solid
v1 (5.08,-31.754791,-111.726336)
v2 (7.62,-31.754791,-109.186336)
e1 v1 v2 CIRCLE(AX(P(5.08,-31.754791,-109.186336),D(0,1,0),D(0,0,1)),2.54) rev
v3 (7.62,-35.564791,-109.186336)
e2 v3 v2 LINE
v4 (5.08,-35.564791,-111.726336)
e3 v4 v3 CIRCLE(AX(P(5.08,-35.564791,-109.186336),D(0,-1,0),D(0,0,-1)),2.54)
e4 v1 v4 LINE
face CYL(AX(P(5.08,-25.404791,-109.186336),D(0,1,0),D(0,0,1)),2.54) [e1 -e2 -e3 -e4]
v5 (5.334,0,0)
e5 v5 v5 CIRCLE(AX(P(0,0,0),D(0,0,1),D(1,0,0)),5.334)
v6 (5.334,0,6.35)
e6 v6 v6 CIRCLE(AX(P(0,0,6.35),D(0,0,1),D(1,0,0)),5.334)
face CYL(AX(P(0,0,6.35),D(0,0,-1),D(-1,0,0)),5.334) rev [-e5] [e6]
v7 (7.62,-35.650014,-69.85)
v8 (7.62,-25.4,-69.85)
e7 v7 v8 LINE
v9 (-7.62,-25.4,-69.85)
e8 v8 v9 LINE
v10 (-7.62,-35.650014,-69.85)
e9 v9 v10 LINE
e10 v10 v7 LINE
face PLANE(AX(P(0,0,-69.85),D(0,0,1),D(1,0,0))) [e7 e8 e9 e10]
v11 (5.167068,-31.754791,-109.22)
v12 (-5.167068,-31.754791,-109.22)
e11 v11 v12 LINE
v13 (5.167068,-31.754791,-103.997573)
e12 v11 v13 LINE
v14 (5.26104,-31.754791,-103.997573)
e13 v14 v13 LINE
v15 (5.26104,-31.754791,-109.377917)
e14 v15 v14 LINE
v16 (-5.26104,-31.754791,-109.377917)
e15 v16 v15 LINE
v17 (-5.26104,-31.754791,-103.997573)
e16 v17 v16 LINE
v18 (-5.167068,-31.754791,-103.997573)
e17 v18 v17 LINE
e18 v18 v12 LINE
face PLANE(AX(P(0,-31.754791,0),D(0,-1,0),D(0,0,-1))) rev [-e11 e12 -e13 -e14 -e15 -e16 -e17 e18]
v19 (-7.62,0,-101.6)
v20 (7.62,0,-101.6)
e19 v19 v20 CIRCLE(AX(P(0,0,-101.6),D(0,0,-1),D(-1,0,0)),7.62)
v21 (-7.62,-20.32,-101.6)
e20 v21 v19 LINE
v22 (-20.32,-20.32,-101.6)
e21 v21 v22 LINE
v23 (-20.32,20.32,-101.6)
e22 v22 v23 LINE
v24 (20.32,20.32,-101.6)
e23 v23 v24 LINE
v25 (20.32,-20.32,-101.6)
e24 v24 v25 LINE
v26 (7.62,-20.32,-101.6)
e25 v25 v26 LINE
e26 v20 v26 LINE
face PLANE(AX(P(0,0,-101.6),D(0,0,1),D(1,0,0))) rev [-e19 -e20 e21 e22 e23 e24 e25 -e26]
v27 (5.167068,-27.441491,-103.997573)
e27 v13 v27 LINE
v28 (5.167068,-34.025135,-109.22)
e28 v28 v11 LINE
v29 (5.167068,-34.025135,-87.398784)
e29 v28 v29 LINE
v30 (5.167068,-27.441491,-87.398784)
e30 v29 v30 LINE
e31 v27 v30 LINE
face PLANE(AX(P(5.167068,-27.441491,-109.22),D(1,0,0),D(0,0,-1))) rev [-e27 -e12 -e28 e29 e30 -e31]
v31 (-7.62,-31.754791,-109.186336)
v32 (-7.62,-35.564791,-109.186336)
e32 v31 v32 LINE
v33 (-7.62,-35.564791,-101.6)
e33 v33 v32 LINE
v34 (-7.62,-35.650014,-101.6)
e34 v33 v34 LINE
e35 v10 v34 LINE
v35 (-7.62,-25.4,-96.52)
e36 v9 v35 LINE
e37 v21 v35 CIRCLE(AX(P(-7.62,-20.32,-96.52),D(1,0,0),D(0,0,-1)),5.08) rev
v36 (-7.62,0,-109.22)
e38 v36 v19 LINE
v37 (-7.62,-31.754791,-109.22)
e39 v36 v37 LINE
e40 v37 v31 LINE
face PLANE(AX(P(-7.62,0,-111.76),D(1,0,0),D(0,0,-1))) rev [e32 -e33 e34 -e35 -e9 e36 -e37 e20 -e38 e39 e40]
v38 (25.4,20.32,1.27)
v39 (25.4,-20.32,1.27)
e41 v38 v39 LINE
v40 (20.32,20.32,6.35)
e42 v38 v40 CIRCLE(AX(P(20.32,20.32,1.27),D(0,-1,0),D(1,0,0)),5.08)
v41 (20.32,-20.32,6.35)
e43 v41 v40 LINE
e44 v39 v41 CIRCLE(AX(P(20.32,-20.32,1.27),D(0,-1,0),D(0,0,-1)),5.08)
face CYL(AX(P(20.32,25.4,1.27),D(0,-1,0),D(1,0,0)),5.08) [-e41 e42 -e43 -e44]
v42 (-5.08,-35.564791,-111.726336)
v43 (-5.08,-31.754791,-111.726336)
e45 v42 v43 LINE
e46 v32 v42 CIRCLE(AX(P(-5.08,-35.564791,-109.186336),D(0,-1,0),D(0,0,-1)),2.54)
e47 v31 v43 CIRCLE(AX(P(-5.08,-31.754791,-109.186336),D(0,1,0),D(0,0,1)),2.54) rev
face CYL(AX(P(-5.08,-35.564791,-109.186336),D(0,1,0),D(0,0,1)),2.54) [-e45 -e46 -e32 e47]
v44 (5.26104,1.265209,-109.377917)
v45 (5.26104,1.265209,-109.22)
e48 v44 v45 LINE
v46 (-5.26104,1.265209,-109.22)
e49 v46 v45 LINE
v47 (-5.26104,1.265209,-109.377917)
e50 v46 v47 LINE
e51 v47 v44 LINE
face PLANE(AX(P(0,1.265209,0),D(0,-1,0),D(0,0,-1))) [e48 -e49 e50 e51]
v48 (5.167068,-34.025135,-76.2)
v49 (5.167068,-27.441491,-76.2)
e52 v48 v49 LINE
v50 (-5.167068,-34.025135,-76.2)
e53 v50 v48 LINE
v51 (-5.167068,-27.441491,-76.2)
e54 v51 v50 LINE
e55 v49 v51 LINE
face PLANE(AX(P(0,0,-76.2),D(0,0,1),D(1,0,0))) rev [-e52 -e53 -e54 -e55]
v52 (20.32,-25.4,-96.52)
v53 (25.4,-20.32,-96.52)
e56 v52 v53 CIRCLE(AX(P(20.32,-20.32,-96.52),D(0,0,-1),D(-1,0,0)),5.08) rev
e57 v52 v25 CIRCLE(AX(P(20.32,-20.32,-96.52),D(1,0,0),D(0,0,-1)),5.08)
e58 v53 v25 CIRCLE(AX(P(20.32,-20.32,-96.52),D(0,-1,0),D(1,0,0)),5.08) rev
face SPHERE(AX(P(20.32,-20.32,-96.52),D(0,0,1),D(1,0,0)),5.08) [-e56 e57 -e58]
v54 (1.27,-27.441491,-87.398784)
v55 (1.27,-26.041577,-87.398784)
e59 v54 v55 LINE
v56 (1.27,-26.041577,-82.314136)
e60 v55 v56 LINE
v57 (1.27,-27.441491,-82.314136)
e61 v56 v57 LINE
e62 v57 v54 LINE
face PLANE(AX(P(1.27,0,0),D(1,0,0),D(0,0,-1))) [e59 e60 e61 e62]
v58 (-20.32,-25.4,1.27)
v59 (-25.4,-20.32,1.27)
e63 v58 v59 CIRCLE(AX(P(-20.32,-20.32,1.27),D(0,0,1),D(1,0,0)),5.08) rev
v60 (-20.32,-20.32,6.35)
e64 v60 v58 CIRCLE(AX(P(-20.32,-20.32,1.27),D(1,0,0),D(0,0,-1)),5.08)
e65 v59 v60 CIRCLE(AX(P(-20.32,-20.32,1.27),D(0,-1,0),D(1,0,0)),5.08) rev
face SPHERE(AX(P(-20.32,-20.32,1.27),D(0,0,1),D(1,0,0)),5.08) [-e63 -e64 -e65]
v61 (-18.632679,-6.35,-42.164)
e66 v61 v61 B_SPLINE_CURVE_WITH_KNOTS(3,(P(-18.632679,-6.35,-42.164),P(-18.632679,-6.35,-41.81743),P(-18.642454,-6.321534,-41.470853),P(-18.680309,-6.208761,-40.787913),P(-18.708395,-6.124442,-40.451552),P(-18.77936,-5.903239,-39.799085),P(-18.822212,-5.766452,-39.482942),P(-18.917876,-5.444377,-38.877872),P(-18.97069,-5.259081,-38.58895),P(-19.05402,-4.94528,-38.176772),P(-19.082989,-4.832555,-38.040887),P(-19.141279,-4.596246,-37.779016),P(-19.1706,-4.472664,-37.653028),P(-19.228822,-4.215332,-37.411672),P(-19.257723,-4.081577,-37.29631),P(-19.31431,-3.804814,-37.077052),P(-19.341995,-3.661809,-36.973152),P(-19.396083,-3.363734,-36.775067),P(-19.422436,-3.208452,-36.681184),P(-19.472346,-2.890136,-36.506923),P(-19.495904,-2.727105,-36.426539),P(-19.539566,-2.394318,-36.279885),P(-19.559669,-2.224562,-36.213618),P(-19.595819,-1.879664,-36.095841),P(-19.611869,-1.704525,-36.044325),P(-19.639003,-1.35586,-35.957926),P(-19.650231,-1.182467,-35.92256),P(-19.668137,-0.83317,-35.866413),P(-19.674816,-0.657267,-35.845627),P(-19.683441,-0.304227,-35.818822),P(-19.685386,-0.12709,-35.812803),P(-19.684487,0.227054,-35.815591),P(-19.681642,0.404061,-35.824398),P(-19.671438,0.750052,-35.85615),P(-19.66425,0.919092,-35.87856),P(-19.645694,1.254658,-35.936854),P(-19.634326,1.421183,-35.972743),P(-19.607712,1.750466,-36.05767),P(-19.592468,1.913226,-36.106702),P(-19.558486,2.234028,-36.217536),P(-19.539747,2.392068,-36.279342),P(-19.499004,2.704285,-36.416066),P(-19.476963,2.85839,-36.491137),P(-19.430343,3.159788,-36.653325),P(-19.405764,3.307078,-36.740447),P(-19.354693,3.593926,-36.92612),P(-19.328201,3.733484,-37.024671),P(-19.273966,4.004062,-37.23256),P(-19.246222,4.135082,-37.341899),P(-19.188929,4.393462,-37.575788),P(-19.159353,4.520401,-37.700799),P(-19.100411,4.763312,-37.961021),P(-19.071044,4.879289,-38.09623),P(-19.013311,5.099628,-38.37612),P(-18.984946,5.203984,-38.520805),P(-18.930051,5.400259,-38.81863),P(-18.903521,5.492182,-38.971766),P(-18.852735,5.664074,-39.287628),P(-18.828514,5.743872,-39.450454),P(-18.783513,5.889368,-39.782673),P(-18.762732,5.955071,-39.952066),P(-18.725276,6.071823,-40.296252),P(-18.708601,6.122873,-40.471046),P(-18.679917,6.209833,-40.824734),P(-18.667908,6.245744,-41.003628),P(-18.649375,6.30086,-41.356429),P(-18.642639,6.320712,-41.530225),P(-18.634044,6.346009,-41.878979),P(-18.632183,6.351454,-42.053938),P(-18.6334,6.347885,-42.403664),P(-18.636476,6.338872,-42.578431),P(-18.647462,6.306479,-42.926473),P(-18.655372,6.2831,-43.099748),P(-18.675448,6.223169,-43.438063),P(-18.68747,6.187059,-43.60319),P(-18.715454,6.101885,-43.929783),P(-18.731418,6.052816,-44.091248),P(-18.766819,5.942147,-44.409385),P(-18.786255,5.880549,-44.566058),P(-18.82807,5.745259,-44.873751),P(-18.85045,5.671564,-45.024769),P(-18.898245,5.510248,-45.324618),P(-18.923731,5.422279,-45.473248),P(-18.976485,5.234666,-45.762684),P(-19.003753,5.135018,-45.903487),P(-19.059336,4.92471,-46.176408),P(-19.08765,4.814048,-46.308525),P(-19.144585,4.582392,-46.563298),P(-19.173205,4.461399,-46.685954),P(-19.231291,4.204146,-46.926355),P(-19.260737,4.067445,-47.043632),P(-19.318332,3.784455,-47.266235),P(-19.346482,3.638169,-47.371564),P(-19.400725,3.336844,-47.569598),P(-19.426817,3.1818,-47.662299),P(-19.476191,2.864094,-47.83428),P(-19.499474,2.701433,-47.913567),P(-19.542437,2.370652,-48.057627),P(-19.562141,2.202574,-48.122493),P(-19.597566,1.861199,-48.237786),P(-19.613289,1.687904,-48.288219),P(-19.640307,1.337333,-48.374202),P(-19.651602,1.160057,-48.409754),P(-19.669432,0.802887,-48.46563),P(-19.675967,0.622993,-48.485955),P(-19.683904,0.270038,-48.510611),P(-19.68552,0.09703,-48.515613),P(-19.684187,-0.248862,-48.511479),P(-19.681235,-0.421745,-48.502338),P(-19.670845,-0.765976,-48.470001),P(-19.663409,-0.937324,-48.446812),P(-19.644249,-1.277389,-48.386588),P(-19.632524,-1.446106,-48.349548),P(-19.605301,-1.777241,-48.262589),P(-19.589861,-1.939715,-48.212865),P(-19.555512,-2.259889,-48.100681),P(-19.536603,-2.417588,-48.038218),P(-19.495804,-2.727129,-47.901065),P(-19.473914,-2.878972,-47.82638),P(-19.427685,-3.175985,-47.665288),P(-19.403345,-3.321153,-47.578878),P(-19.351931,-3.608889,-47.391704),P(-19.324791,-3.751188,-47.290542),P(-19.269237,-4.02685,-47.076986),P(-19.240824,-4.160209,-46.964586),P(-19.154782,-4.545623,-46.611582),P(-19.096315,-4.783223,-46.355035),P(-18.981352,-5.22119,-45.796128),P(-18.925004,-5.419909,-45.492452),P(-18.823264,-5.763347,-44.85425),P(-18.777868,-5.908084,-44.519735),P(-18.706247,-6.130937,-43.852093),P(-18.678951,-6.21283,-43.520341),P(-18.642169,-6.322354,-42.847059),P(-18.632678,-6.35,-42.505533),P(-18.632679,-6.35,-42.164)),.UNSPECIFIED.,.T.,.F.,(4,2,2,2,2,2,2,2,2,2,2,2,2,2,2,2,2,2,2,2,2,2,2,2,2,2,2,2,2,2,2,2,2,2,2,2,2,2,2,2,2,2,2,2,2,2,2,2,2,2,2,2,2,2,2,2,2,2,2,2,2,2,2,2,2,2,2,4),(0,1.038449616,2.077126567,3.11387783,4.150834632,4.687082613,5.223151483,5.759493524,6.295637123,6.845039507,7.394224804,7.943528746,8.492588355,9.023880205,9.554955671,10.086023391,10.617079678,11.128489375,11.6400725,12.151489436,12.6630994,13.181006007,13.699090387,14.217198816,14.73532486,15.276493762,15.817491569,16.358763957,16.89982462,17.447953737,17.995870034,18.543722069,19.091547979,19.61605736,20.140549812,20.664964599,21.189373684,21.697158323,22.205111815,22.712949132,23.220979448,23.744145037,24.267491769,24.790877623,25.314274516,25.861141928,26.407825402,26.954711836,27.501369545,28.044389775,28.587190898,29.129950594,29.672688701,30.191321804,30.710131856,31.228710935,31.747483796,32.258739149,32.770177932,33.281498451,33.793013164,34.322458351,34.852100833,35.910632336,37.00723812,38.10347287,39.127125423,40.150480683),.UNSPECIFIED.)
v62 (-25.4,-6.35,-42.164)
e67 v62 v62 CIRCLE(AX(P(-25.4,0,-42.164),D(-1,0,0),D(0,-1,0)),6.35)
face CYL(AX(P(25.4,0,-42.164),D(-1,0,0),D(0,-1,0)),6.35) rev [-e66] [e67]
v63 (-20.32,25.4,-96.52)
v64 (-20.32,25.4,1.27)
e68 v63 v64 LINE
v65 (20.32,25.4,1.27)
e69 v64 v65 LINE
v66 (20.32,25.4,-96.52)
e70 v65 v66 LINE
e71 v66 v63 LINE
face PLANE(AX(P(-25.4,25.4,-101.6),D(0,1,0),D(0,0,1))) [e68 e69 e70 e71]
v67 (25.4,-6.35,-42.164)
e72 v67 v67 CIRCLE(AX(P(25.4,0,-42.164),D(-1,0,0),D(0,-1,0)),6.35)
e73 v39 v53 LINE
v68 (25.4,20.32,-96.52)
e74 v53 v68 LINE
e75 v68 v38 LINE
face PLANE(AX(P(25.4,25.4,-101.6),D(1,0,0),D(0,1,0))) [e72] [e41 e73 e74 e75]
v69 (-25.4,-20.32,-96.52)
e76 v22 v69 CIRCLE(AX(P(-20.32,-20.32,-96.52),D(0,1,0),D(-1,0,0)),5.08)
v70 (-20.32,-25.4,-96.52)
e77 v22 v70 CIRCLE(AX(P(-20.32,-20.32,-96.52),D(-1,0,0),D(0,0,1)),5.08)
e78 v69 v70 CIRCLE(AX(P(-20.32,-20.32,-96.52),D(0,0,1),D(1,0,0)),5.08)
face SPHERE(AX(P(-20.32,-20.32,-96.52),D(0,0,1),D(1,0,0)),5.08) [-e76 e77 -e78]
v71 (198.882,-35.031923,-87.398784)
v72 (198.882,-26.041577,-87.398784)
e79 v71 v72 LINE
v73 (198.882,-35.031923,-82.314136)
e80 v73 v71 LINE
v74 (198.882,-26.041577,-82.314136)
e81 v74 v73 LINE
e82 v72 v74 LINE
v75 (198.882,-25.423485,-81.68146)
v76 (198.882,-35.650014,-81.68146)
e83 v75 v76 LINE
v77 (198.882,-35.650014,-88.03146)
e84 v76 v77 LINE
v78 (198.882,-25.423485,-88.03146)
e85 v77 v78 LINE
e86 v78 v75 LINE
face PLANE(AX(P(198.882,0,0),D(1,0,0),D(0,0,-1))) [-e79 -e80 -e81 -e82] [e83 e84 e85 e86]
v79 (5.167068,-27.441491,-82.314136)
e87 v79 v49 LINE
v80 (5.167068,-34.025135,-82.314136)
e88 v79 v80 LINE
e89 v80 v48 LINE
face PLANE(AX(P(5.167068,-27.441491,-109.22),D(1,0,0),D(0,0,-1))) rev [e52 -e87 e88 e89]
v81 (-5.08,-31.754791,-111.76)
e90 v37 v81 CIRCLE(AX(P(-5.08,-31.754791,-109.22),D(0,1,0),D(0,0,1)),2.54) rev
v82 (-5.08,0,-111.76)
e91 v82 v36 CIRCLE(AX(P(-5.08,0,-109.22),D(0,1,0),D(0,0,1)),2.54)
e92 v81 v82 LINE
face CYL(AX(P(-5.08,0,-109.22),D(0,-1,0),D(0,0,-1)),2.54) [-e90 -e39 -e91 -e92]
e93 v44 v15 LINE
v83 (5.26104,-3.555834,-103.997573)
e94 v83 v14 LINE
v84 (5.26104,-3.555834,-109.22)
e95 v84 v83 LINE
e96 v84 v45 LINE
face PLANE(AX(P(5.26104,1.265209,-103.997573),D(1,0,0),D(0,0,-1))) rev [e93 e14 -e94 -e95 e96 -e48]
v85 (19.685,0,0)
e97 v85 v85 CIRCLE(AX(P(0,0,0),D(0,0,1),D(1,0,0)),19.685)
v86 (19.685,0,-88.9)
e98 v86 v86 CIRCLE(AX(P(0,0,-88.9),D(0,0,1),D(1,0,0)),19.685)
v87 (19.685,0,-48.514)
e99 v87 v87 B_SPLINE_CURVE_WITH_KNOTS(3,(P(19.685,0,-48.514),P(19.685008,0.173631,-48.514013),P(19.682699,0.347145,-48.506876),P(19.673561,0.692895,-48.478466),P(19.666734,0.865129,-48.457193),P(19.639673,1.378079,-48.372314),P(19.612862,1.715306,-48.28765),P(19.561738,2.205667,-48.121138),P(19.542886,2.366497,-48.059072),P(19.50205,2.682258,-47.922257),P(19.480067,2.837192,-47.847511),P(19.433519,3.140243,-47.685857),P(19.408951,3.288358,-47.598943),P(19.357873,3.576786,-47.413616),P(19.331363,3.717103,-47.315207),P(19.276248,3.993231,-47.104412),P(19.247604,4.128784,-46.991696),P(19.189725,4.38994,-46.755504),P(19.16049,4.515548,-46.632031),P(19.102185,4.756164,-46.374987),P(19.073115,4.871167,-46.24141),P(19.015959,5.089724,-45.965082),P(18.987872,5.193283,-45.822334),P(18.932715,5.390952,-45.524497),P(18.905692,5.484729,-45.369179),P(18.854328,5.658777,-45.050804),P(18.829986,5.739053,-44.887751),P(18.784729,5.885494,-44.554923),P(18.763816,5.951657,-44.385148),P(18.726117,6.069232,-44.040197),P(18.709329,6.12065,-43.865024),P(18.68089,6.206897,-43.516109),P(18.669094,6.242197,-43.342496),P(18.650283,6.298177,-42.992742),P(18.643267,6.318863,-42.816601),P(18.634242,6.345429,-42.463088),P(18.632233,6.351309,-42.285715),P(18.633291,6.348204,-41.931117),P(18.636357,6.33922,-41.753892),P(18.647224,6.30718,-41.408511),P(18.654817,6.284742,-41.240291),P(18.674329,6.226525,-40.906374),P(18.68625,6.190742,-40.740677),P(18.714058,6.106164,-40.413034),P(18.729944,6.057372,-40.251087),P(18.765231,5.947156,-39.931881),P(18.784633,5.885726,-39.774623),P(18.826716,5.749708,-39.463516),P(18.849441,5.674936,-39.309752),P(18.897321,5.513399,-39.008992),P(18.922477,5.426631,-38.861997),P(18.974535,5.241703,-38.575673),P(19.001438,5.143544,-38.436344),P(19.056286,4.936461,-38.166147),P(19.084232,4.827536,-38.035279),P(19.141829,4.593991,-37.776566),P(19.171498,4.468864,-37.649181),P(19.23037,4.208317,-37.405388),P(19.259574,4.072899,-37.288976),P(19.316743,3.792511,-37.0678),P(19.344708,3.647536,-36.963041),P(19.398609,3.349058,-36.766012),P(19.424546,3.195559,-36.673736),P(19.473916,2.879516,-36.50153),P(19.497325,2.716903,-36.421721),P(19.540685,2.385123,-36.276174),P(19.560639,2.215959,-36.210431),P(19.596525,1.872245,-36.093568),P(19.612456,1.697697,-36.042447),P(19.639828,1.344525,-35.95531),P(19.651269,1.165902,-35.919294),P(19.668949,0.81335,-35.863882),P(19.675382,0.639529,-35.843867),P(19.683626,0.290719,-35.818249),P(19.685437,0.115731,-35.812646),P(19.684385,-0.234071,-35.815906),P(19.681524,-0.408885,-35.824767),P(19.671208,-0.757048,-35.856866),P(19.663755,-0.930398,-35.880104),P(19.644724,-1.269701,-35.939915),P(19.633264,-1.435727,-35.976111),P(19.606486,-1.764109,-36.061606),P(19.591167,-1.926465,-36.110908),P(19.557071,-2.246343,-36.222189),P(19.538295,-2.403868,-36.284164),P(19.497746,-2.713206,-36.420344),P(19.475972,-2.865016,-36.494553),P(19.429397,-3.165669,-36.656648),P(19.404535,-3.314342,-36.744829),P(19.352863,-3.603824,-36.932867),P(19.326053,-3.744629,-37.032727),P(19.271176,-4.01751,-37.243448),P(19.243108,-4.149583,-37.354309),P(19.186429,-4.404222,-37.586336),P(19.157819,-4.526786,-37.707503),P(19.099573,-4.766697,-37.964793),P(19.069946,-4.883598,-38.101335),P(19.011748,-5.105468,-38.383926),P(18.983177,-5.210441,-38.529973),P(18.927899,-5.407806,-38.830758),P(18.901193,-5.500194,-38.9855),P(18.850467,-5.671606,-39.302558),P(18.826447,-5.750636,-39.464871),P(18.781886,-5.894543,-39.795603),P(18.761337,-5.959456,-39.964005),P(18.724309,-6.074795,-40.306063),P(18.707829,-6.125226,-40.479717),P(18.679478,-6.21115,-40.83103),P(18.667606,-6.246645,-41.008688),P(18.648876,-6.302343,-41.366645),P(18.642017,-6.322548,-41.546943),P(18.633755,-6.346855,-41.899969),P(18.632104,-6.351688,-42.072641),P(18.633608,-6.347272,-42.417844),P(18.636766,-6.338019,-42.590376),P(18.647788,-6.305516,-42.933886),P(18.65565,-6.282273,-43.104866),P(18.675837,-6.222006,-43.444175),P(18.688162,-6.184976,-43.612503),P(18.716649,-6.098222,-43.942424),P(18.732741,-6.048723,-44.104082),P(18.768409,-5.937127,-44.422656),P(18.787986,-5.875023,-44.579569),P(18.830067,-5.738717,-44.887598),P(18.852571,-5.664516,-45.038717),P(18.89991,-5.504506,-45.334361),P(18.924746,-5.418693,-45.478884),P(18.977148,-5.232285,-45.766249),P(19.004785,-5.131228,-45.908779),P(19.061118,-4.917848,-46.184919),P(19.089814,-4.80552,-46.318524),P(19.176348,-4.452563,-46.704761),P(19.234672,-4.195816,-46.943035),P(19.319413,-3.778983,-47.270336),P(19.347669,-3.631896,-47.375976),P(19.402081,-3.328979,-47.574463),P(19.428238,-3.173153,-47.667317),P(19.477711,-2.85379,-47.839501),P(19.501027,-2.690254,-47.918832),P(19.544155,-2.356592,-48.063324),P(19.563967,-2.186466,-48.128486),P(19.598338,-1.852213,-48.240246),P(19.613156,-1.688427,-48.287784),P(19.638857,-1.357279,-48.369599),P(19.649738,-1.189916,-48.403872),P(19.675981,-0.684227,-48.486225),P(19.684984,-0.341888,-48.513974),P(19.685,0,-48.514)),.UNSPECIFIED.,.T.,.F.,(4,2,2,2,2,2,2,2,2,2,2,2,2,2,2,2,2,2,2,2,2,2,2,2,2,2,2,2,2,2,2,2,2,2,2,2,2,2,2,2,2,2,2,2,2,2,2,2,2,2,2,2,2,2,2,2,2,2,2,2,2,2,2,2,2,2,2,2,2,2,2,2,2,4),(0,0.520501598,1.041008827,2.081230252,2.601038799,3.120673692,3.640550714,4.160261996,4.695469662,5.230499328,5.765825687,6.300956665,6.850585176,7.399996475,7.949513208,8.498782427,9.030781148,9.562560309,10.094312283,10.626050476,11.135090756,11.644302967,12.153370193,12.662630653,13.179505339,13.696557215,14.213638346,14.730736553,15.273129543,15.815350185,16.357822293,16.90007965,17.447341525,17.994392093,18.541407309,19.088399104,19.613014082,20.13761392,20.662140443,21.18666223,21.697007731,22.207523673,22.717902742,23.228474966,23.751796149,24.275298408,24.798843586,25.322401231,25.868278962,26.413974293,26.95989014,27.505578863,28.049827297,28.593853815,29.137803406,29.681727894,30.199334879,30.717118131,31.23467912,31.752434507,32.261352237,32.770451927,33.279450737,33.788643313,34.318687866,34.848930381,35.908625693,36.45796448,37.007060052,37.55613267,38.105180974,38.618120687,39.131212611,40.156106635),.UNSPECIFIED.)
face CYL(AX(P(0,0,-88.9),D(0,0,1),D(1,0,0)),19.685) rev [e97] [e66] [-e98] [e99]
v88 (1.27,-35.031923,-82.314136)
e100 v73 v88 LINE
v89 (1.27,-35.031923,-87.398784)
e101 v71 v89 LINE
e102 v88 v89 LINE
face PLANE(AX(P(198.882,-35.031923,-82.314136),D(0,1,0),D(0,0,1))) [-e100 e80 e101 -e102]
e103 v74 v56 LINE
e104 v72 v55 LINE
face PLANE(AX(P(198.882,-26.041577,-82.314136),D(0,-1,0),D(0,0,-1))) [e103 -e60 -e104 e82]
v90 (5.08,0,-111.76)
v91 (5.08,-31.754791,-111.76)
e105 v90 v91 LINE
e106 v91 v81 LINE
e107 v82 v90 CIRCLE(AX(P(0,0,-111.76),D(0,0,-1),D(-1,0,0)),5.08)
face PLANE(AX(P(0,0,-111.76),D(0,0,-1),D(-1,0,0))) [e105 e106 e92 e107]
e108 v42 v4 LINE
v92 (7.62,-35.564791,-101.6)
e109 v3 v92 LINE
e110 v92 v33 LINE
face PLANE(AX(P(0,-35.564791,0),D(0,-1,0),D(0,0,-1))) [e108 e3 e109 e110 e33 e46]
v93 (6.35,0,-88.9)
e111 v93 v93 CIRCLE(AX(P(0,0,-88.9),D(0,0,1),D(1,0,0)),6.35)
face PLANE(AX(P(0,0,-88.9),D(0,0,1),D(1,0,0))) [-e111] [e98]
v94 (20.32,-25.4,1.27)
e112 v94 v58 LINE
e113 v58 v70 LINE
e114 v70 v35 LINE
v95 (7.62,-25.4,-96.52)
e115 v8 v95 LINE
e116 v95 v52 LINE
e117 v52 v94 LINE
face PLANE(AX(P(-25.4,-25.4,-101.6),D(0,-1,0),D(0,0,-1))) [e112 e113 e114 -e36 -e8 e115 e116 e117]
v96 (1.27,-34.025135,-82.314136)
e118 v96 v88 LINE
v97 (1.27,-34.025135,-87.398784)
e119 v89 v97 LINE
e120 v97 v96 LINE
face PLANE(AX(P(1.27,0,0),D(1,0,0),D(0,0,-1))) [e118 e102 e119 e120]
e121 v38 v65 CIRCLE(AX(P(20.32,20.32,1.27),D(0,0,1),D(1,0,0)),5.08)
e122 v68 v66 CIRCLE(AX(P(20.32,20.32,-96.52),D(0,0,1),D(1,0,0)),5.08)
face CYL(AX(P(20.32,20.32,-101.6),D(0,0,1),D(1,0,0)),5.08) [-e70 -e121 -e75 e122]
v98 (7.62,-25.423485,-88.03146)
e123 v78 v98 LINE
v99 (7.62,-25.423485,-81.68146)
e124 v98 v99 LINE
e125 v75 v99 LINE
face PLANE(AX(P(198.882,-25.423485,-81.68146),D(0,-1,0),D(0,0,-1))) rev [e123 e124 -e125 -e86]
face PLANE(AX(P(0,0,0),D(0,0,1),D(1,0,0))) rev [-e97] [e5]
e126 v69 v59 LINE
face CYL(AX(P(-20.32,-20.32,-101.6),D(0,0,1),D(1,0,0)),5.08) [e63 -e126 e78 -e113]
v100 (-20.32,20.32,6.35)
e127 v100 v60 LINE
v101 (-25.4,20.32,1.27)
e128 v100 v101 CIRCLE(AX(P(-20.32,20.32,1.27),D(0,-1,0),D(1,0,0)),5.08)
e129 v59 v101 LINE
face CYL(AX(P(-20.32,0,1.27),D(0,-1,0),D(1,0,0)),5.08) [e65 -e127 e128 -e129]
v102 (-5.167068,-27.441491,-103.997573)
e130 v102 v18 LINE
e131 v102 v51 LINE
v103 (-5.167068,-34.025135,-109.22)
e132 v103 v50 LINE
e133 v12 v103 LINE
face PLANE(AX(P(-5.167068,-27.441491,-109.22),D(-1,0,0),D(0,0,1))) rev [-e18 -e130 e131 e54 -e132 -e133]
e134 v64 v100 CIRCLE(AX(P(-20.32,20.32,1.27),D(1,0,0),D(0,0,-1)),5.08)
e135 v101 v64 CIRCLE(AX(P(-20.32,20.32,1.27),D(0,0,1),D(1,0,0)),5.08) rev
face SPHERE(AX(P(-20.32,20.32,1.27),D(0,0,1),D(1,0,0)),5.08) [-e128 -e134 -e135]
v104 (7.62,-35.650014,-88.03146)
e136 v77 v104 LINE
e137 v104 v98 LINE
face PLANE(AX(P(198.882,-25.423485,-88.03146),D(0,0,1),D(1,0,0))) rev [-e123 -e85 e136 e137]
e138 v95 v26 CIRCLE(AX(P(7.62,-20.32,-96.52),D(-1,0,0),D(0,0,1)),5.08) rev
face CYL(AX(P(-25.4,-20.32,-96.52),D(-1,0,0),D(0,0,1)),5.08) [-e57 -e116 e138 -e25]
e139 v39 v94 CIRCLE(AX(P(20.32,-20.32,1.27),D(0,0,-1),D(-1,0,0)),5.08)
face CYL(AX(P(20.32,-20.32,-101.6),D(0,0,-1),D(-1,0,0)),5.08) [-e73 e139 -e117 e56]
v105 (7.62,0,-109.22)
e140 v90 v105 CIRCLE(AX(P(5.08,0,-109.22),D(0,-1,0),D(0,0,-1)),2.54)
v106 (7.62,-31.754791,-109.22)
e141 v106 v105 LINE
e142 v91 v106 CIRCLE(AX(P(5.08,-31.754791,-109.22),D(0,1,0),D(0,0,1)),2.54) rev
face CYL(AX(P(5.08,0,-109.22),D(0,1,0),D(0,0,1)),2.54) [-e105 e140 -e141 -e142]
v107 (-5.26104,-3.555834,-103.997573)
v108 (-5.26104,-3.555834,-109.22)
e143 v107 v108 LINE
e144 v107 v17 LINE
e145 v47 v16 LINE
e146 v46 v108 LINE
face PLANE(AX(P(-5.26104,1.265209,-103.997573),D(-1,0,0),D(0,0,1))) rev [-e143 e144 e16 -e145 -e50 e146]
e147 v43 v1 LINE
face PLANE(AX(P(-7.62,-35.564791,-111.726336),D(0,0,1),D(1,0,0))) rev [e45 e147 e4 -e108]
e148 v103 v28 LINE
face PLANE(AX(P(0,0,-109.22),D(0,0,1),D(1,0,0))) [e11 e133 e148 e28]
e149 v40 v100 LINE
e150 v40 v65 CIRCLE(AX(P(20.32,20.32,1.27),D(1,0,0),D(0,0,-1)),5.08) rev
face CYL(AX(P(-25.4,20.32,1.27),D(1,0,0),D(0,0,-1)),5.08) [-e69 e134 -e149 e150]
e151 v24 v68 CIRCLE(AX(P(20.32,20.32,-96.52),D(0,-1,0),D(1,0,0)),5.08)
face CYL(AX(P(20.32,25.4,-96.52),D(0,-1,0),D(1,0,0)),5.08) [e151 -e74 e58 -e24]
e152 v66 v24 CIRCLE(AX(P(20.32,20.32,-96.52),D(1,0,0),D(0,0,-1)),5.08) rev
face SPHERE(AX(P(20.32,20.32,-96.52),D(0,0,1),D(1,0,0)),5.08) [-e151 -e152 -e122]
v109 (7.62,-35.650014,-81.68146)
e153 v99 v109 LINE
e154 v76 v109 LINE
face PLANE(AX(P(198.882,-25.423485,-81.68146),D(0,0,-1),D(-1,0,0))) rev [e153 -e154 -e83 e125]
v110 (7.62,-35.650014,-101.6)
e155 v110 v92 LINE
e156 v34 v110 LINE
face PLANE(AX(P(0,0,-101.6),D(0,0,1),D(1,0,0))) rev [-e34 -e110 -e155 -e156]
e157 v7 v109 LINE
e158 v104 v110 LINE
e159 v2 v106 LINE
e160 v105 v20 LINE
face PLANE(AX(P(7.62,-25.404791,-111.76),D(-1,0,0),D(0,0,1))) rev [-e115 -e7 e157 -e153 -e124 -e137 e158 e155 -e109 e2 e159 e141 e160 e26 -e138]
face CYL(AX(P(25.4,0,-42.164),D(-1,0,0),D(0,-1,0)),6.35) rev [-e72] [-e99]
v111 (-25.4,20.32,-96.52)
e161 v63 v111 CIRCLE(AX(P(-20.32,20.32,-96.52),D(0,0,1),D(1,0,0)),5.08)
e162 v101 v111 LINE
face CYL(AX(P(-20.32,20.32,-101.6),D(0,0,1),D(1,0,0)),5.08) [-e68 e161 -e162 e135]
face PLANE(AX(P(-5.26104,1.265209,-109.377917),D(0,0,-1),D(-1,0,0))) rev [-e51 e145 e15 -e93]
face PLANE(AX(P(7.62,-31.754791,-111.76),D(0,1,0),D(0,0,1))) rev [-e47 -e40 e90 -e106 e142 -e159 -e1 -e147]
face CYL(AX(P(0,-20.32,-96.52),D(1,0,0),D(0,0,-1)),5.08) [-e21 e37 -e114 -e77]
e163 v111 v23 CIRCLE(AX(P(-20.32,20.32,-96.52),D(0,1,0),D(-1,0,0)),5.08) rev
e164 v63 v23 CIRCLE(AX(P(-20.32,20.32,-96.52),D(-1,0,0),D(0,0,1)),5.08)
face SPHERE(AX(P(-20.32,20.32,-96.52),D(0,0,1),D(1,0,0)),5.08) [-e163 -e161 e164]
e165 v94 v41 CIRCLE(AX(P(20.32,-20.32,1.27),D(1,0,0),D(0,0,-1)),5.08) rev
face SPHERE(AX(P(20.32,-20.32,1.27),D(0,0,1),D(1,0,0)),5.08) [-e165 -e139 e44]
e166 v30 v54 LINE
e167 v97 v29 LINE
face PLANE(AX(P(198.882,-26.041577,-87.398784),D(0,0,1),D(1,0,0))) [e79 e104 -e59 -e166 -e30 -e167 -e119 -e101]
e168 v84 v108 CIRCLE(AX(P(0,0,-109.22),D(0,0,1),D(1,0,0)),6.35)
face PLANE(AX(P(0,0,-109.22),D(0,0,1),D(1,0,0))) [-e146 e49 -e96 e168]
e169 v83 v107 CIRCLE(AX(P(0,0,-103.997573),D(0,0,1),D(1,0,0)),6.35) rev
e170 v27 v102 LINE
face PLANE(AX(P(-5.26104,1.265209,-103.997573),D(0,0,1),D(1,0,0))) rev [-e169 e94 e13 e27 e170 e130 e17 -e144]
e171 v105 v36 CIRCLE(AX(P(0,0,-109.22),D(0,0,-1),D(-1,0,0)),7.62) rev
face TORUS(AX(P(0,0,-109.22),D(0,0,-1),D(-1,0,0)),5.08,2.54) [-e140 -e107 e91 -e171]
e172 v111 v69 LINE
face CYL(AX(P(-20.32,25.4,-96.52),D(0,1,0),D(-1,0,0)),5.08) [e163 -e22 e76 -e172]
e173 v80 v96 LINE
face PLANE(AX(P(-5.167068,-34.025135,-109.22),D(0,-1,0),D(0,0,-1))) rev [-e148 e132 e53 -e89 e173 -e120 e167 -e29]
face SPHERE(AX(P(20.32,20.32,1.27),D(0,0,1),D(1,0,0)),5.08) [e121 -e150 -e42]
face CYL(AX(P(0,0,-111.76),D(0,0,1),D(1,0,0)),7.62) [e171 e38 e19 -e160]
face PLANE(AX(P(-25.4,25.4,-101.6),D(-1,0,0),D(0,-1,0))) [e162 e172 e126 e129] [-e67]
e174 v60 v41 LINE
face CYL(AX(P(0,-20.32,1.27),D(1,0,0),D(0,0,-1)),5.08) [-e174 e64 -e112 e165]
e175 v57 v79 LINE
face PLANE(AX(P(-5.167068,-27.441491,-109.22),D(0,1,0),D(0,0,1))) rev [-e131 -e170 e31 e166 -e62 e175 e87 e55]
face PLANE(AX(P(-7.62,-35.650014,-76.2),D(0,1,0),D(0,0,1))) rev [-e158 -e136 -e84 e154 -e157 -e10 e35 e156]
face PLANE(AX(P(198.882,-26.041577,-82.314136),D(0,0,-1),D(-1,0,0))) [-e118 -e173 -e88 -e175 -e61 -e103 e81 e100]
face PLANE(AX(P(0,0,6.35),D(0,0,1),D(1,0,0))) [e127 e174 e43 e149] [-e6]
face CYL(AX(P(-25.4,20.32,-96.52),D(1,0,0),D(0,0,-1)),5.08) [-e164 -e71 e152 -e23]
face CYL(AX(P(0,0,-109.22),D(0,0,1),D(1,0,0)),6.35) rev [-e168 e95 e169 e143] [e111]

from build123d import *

# Parameters (mm, degrees)
SKETCH1_W               = 50.8
SKETCH1_H               = 50.8
BOSS_EXTRUDE1_DEPTH     = 101.6
SKETCH3_R               = 19.685
CUT_EXTRUDE1_DEPTH      = 88.9
BOSS_EXTRUDE2_DEPTH     = 10.16
SKETCH11_R              = 6.35
CUT_EXTRUDE3_DEPTH      = 20.32
SKETCH13_W              = 50.8
SKETCH13_H              = 50.8
SKETCH13_R              = 5.334
BOSS_EXTRUDE4_DEPTH     = 6.35
FILLET2_R               = 5.08
FILLET5_R               = 2.54
CUT_EXTRUDE5_DEPTH      = 127.804196843
CUT_EXTRUDE5_DEPTH_BACK = 127.804196843
SKETCH14_R              = 6.35
FILLET8_R               = 5.08
FILLET10_R              = 5.08
FILLET11_R              = 5.08
FILLET12_R              = 5.08
FILLET13_R              = 5.08
SKETCH16_W              = 10.522080148
SKETCH16_H              = 5.380343577
CUT_EXTRUDE6_DEPTH      = 33.02
SKETCH23_W              = 15.24
SKETCH23_H              = 10.12633605
BOSS_EXTRUDE8_DEPTH     = 3.81
FILLET18_R              = 2.54
FILLET19_R              = 2.54
SKETCH24_W              = 15.24
SKETCH24_H              = 10.250014382
BOSS_EXTRUDE9_DEPTH     = 25.4
SKETCH25_W              = 10.33413659
SKETCH25_H              = 6.58364474
CUT_EXTRUDE9_DEPTH      = 33.02
SKETCH26_W              = 15.24
SKETCH26_H              = 10.250014382
BOSS_EXTRUDE10_DEPTH    = 6.35
SKETCH27_W              = 6.35
SKETCH27_H              = 10.22652942
SKETCH27_W_2            = 5.084647905
SKETCH27_H_2            = 8.990346269
BOSS_EXTRUDE11_DEPTH    = 191.262
SKETCH28_W              = 5.084647905
SKETCH28_H              = 8.990346269
CUT_EXTRUDE10_DEPTH     = 6.35


with BuildPart() as part:
    # Sketch1 → Boss-Extrude1 (new body)
    with BuildSketch(Plane.XY):
        Rectangle(SKETCH1_W, SKETCH1_H)
    extrude(amount=-BOSS_EXTRUDE1_DEPTH)

    # Sketch3 → Cut-Extrude1 (cut)
    with BuildSketch(Plane.XY):
        Circle(SKETCH3_R)
    extrude(amount=-CUT_EXTRUDE1_DEPTH, mode=Mode.SUBTRACT)

    # Sketch6 → Boss-Extrude2 (add)
    with BuildSketch(Plane(origin=(0, 0, -101.6), x_dir=(-1, 0, 0), z_dir=(0, 0, -1))):
        with BuildLine():
            Line((-7.62, 0), (-7.62, -25.404790774))
            Line((-7.62, -25.404790774), (-7.62, -31.754790774))
            Line((-7.62, -31.754790774), (7.62, -31.754790774))
            Line((7.62, -31.754790774), (7.62, -25.404790774))
            Line((7.62, -25.404790774), (7.62, 0))
            ThreePointArc((7.62, 0), (0, 7.62), (-7.62, 0))
        make_face()
    extrude(amount=BOSS_EXTRUDE2_DEPTH)

    # Sketch11 → Cut-Extrude3 (cut)
    with BuildSketch(Plane.XY.offset(-88.9)):
        Circle(SKETCH11_R)
    extrude(amount=-CUT_EXTRUDE3_DEPTH, mode=Mode.SUBTRACT)

    # Sketch13 → Boss-Extrude4 (add)
    with BuildSketch(Plane.XY):
        Rectangle(SKETCH13_W, SKETCH13_H)
        Circle(SKETCH13_R, mode=Mode.SUBTRACT)
    extrude(amount=BOSS_EXTRUDE4_DEPTH)

    # Fillet2
    fillet2_edges = [part.edges().sort_by_distance(p)[0] for p in [
        (-25.4, 0, -101.6),
        (-25.4, 0, 6.35),
        (-25.4, -25.4, -47.625),
        (-25.4, 25.4, -47.625),
    ]]
    fillet(fillet2_edges, radius=FILLET2_R)

    # Fillet5
    fillet5_edges = [part.edges().sort_by_distance(p)[0] for p in [
        (0, 7.62, -111.76),
        (7.62, -15.877395387, -111.76),
        (-7.62, -15.877395387, -111.76),
    ]]
    fillet(fillet5_edges, radius=FILLET5_R)

    # Sketch14 → Cut-Extrude5 (cut, two sides: drawn at the far end of the back side and taken through both)
    with BuildSketch(Plane.ZY.offset(25.4).offset(-CUT_EXTRUDE5_DEPTH_BACK)):
        with Locations(Location((-42.164, 0, 0), (0, 0, 270))):
            Circle(SKETCH14_R)
    extrude(amount=CUT_EXTRUDE5_DEPTH + CUT_EXTRUDE5_DEPTH_BACK, mode=Mode.SUBTRACT)

    # Fillet8
    # the kernel refuses this fillet: 5.08 mm, written as the material it takes off along each edge
    with BuildSketch(Plane(origin=(-20.32, -20.32, 1.27), x_dir=(0, 0, 1), z_dir=(0, -1, 0))) as fillet8_piece_1_section:
        Polygon((0, 0), (FILLET8_R, 0), (FILLET8_R, FILLET8_R), (0, FILLET8_R), align=None)
    fillet8_piece_1 = extrude(amount=FILLET8_R, mode=Mode.PRIVATE)
    fillet8_piece_1 = fillet8_piece_1 - Plane(origin=(-20.32, -20.32, 1.27), x_dir=(0.7071067811865475, 0, -0.7071067811865475), z_dir=(0, -1, 0)) * Sphere(FILLET8_R, mode=Mode.PRIVATE)
    add(fillet8_piece_1, mode=Mode.SUBTRACT)
    with BuildSketch(Plane(origin=(-20.32, 20.32, -96.52), x_dir=(0, 1, 0), z_dir=(0, 0, -1))) as fillet8_piece_2_section:
        Polygon((0, 0), (FILLET8_R, 0), (FILLET8_R, -FILLET8_R), (0, -FILLET8_R), align=None)
    fillet8_piece_2 = extrude(amount=FILLET8_R, mode=Mode.PRIVATE)
    fillet8_piece_2 = fillet8_piece_2 - Plane(origin=(-20.32, 20.32, -96.52), x_dir=(0.7071067811865476, -0.7071067811865475, 0), z_dir=(0, 0, -1)) * Sphere(FILLET8_R, mode=Mode.PRIVATE)
    add(fillet8_piece_2, mode=Mode.SUBTRACT)
    with BuildSketch(Plane(origin=(25.4, 38.1, -101.6), x_dir=(-1, 0, 0), z_dir=(0, -1, 0))) as fillet8_piece_3:
        with BuildLine():
            CenterArc((FILLET8_R, -FILLET8_R), FILLET8_R, 90, 90)
            Line((0, -FILLET8_R), (0, 0))
            Line((0, 0), (FILLET8_R, 0))
        make_face()
    extrude(amount=76.2, mode=Mode.SUBTRACT)
    with BuildSketch(Plane(origin=(38.1, -25.4, 6.35), x_dir=(0, 0, -1), z_dir=(-1, 0, 0)), Plane(origin=(-20.32, 25.4, -101.6), x_dir=(0, -1, 0), z_dir=(1, 0, 0))) as fillet8_piece_4:
        with BuildLine():
            CenterArc((FILLET8_R, -FILLET8_R), FILLET8_R, 90, 90)
            Line((0, -FILLET8_R), (0, 0))
            Line((0, 0), (FILLET8_R, 0))
        make_face()
    extrude(amount=58.42, mode=Mode.SUBTRACT)
    with BuildSketch(Plane(origin=(25.4, -25.4, 19.05), x_dir=(-1, 0, 0), z_dir=(0, 0, -1))) as fillet8_piece_5:
        with BuildLine():
            CenterArc((FILLET8_R, FILLET8_R), FILLET8_R, 180, 90)
            Line((0, FILLET8_R), (0, 0))
            Line((0, 0), (FILLET8_R, 0))
        make_face()
    extrude(amount=133.35, mode=Mode.SUBTRACT)

    # Fillet10
    # the kernel refuses this fillet: 5.08 mm, written as the material it takes off along each edge
    with BuildSketch(Plane(origin=(20.32, -20.32, 1.27), x_dir=(0, 0, 1), z_dir=(1, 0, 0))) as fillet10_piece_1_section:
        Polygon((0, 0), (FILLET10_R, 0), (FILLET10_R, FILLET10_R), (0, FILLET10_R), align=None)
    fillet10_piece_1 = extrude(amount=FILLET10_R, mode=Mode.PRIVATE)
    fillet10_piece_1 = fillet10_piece_1 - Plane(origin=(20.32, -20.32, 1.27), x_dir=(0, 0.7071067811865475, -0.7071067811865475), z_dir=(1, 0, 0)) * Sphere(FILLET10_R, mode=Mode.PRIVATE)
    add(fillet10_piece_1, mode=Mode.SUBTRACT)
    with BuildSketch(Plane(origin=(-20.32, 20.32, 1.27), x_dir=(0, 0, 1), z_dir=(0, 1, 0))) as fillet10_piece_2_section:
        Polygon((0, 0), (FILLET10_R, 0), (FILLET10_R, -FILLET10_R), (0, -FILLET10_R), align=None)
    fillet10_piece_2 = extrude(amount=FILLET10_R, mode=Mode.PRIVATE)
    fillet10_piece_2 = fillet10_piece_2 - Plane(origin=(-20.32, 20.32, 1.27), x_dir=(0.7071067811865475, 0, -0.7071067811865475), z_dir=(0, 1, 0)) * Sphere(FILLET10_R, mode=Mode.PRIVATE)
    add(fillet10_piece_2, mode=Mode.SUBTRACT)
    with BuildSketch(Plane(origin=(-20.32, 25.4, 6.35), x_dir=(0, 0, -1), z_dir=(1, 0, 0)), Plane(origin=(25.4, 38.1, 6.35), x_dir=(0, 0, -1), z_dir=(0, -1, 0))) as fillet10_piece_3:
        with BuildLine():
            CenterArc((FILLET10_R, -FILLET10_R), FILLET10_R, 90, 90)
            Line((0, -FILLET10_R), (0, 0))
            Line((0, 0), (FILLET10_R, 0))
        make_face()
    extrude(amount=58.42, mode=Mode.SUBTRACT)

    # Fillet11
    # the kernel refuses this fillet: 5.08 mm, written as the material it takes off along each edge
    with BuildSketch(Plane(origin=(20.32, 20.32, -96.52), x_dir=(0, 1, 0), z_dir=(1, 0, 0))) as fillet11_piece_1_section:
        Polygon((0, 0), (FILLET11_R, 0), (FILLET11_R, -FILLET11_R), (0, -FILLET11_R), align=None)
    fillet11_piece_1 = extrude(amount=FILLET11_R, mode=Mode.PRIVATE)
    fillet11_piece_1 = fillet11_piece_1 - Plane(origin=(20.32, 20.32, -96.52), x_dir=(0, -0.7071067811865475, 0.7071067811865475), z_dir=(1, 0, 0)) * Sphere(FILLET11_R, mode=Mode.PRIVATE)
    add(fillet11_piece_1, mode=Mode.SUBTRACT)
    with BuildSketch(Plane(origin=(20.32, 20.32, 1.27), x_dir=(0, 1, 0), z_dir=(1, 0, 0))) as fillet11_piece_2_section:
        Polygon((0, 0), (FILLET11_R, 0), (FILLET11_R, FILLET11_R), (0, FILLET11_R), align=None)
    fillet11_piece_2 = extrude(amount=FILLET11_R, mode=Mode.PRIVATE)
    fillet11_piece_2 = fillet11_piece_2 - Plane(origin=(20.32, 20.32, 1.27), x_dir=(0, -0.7071067811865475, -0.7071067811865475), z_dir=(1, 0, 0)) * Sphere(FILLET11_R, mode=Mode.PRIVATE)
    add(fillet11_piece_2, mode=Mode.SUBTRACT)
    with BuildSketch(Plane(origin=(25.4, 25.4, 1.27), x_dir=(0, -1, 0), z_dir=(0, 0, -1))) as fillet11_piece_3:
        with BuildLine():
            CenterArc((FILLET11_R, FILLET11_R), FILLET11_R, 180, 90)
            Line((0, FILLET11_R), (0, 0))
            Line((0, 0), (FILLET11_R, 0))
        make_face()
    extrude(amount=97.79, mode=Mode.SUBTRACT)

    # Fillet12
    # the kernel refuses this fillet: 5.08 mm, written as the material it takes off along each edge
    with BuildSketch(Plane(origin=(-20.32, -20.32, -96.52), x_dir=(0, -1, 0), z_dir=(0, 0, -1))) as fillet12_piece_1_section:
        Polygon((0, 0), (FILLET12_R * 1.02, 0), (FILLET12_R * 1.02, FILLET12_R * 1.02), (0, FILLET12_R * 1.02), align=None)
    fillet12_piece_1 = extrude(amount=FILLET12_R * 1.02, mode=Mode.PRIVATE)
    fillet12_piece_1 = fillet12_piece_1 - Plane(origin=(-20.32, -20.32, -96.52), x_dir=(0.7071067811865475, 0.7071067811865477, 0), z_dir=(0, 0, -1)) * Sphere(FILLET12_R, mode=Mode.PRIVATE)
    add(fillet12_piece_1, mode=Mode.SUBTRACT)
    with BuildSketch(Plane(origin=(-7.62, -25.4, -101.6), x_dir=(0, 1, 0), z_dir=(-1, 0, 0))) as fillet12_piece_2:
        with BuildLine():
            CenterArc((FILLET12_R, -FILLET12_R), FILLET12_R, 90, 90)
            Line((0, -FILLET12_R), (0, 0))
            Line((0, 0), (FILLET12_R, 0))
        make_face()
    extrude(amount=12.7, mode=Mode.SUBTRACT)

    # Fillet13
    # the kernel refuses this fillet: 5.08 mm, written as the material it takes off along each edge
    with BuildSketch(Plane(origin=(20.32, -20.32, -96.52), x_dir=(0, -1, 0), z_dir=(0, 0, -1))) as fillet13_piece_1_section:
        Polygon((0, 0), (FILLET13_R * 1.02, 0), (FILLET13_R * 1.02, -FILLET13_R * 1.02), (0, -FILLET13_R * 1.02), align=None)
    fillet13_piece_1 = extrude(amount=FILLET13_R * 1.02, mode=Mode.PRIVATE)
    fillet13_piece_1 = fillet13_piece_1 - Plane(origin=(20.32, -20.32, -96.52), x_dir=(-0.7071067811865476, 0.7071067811865475, 0), z_dir=(0, 0, -1)) * Sphere(FILLET13_R, mode=Mode.PRIVATE)
    add(fillet13_piece_1, mode=Mode.SUBTRACT)
    with BuildSketch(Plane(origin=(20.32, -25.4, -101.6), x_dir=(0, 1, 0), z_dir=(-1, 0, 0))) as fillet13_piece_2:
        with BuildLine():
            CenterArc((FILLET13_R, -FILLET13_R), FILLET13_R, 90, 90)
            Line((0, -FILLET13_R), (0, 0))
            Line((0, 0), (FILLET13_R, 0))
        make_face()
    extrude(amount=12.7, mode=Mode.SUBTRACT)

    # Sketch16 → Cut-Extrude6 (cut)
    with BuildSketch(Plane.XZ.offset(31.754790774)):
        with Locations((0, -106.687745086)):
            Rectangle(SKETCH16_W, SKETCH16_H)
    extrude(amount=-CUT_EXTRUDE6_DEPTH, mode=Mode.SUBTRACT)

    # Sketch23 → Boss-Extrude8 (add)
    with BuildSketch(Plane.XZ.offset(31.754790774)):
        with Locations((0, -106.663168025)):
            Rectangle(SKETCH23_W, SKETCH23_H)
    extrude(amount=BOSS_EXTRUDE8_DEPTH)

    # Fillet18
    # the kernel refuses this fillet: 2.54 mm, written as the material it takes off along each edge
    with BuildSketch(Plane(origin=(7.62, -31.754790774, -111.72633605), x_dir=(-1, 0, 0), z_dir=(0, -1, 0))) as fillet18_piece_1:
        with BuildLine():
            CenterArc((FILLET18_R, -FILLET18_R), FILLET18_R, 90, 90)
            Line((0, -FILLET18_R), (0, 0))
            Line((0, 0), (FILLET18_R, 0))
        make_face()
    extrude(amount=10.16, mode=Mode.SUBTRACT)

    # Fillet19
    # the kernel refuses this fillet: 2.54 mm, written as the material it takes off along each edge
    with BuildSketch(Plane(origin=(-7.62, -31.754790774, -111.72633605), x_dir=(0, 0, 1), z_dir=(0, -1, 0))) as fillet19_piece_1:
        with BuildLine():
            CenterArc((FILLET19_R, -FILLET19_R), FILLET19_R, 90, 90)
            Line((0, -FILLET19_R), (0, 0))
            Line((0, 0), (FILLET19_R, 0))
        make_face()
    extrude(amount=10.16, mode=Mode.SUBTRACT)

    # Sketch24 → Boss-Extrude9 (add)
    with BuildSketch(Plane.XY.offset(-101.6)):
        with Locations((0, -30.525007191)):
            Rectangle(SKETCH24_W, SKETCH24_H)
    extrude(amount=BOSS_EXTRUDE9_DEPTH)

    # Sketch25 → Cut-Extrude9 (cut)
    with BuildSketch(Plane.XY.offset(-76.2)):
        with Locations((0, -30.733312974)):
            Rectangle(SKETCH25_W, SKETCH25_H)
    extrude(amount=-CUT_EXTRUDE9_DEPTH, mode=Mode.SUBTRACT)

    # Sketch26 → Boss-Extrude10 (add)
    with BuildSketch(Plane.XY.offset(-76.2)):
        with Locations((0, -30.525007191)):
            Rectangle(SKETCH26_W, SKETCH26_H)
    extrude(amount=BOSS_EXTRUDE10_DEPTH)

    # Sketch27 → Boss-Extrude11 (add)
    with BuildSketch(Plane(origin=(7.62, 0, 0), x_dir=(0, 0, -1), z_dir=(1, 0, 0))):
        with Locations((84.856460364, -30.536749672)):
            Rectangle(SKETCH27_W, SKETCH27_H)
        with Locations((84.856460365, -30.536749672)):
            Rectangle(SKETCH27_W_2, SKETCH27_H_2, mode=Mode.SUBTRACT)
    extrude(amount=BOSS_EXTRUDE11_DEPTH)

    # Sketch28 → Cut-Extrude10 (cut)
    with BuildSketch(Plane(origin=(7.62, 0, 0), x_dir=(0, 0, -1), z_dir=(1, 0, 0))):
        with Locations((84.856460365, -30.536749672)):
            Rectangle(SKETCH28_W, SKETCH28_H)
    extrude(amount=-CUT_EXTRUDE10_DEPTH, mode=Mode.SUBTRACT)


solid = part.part
